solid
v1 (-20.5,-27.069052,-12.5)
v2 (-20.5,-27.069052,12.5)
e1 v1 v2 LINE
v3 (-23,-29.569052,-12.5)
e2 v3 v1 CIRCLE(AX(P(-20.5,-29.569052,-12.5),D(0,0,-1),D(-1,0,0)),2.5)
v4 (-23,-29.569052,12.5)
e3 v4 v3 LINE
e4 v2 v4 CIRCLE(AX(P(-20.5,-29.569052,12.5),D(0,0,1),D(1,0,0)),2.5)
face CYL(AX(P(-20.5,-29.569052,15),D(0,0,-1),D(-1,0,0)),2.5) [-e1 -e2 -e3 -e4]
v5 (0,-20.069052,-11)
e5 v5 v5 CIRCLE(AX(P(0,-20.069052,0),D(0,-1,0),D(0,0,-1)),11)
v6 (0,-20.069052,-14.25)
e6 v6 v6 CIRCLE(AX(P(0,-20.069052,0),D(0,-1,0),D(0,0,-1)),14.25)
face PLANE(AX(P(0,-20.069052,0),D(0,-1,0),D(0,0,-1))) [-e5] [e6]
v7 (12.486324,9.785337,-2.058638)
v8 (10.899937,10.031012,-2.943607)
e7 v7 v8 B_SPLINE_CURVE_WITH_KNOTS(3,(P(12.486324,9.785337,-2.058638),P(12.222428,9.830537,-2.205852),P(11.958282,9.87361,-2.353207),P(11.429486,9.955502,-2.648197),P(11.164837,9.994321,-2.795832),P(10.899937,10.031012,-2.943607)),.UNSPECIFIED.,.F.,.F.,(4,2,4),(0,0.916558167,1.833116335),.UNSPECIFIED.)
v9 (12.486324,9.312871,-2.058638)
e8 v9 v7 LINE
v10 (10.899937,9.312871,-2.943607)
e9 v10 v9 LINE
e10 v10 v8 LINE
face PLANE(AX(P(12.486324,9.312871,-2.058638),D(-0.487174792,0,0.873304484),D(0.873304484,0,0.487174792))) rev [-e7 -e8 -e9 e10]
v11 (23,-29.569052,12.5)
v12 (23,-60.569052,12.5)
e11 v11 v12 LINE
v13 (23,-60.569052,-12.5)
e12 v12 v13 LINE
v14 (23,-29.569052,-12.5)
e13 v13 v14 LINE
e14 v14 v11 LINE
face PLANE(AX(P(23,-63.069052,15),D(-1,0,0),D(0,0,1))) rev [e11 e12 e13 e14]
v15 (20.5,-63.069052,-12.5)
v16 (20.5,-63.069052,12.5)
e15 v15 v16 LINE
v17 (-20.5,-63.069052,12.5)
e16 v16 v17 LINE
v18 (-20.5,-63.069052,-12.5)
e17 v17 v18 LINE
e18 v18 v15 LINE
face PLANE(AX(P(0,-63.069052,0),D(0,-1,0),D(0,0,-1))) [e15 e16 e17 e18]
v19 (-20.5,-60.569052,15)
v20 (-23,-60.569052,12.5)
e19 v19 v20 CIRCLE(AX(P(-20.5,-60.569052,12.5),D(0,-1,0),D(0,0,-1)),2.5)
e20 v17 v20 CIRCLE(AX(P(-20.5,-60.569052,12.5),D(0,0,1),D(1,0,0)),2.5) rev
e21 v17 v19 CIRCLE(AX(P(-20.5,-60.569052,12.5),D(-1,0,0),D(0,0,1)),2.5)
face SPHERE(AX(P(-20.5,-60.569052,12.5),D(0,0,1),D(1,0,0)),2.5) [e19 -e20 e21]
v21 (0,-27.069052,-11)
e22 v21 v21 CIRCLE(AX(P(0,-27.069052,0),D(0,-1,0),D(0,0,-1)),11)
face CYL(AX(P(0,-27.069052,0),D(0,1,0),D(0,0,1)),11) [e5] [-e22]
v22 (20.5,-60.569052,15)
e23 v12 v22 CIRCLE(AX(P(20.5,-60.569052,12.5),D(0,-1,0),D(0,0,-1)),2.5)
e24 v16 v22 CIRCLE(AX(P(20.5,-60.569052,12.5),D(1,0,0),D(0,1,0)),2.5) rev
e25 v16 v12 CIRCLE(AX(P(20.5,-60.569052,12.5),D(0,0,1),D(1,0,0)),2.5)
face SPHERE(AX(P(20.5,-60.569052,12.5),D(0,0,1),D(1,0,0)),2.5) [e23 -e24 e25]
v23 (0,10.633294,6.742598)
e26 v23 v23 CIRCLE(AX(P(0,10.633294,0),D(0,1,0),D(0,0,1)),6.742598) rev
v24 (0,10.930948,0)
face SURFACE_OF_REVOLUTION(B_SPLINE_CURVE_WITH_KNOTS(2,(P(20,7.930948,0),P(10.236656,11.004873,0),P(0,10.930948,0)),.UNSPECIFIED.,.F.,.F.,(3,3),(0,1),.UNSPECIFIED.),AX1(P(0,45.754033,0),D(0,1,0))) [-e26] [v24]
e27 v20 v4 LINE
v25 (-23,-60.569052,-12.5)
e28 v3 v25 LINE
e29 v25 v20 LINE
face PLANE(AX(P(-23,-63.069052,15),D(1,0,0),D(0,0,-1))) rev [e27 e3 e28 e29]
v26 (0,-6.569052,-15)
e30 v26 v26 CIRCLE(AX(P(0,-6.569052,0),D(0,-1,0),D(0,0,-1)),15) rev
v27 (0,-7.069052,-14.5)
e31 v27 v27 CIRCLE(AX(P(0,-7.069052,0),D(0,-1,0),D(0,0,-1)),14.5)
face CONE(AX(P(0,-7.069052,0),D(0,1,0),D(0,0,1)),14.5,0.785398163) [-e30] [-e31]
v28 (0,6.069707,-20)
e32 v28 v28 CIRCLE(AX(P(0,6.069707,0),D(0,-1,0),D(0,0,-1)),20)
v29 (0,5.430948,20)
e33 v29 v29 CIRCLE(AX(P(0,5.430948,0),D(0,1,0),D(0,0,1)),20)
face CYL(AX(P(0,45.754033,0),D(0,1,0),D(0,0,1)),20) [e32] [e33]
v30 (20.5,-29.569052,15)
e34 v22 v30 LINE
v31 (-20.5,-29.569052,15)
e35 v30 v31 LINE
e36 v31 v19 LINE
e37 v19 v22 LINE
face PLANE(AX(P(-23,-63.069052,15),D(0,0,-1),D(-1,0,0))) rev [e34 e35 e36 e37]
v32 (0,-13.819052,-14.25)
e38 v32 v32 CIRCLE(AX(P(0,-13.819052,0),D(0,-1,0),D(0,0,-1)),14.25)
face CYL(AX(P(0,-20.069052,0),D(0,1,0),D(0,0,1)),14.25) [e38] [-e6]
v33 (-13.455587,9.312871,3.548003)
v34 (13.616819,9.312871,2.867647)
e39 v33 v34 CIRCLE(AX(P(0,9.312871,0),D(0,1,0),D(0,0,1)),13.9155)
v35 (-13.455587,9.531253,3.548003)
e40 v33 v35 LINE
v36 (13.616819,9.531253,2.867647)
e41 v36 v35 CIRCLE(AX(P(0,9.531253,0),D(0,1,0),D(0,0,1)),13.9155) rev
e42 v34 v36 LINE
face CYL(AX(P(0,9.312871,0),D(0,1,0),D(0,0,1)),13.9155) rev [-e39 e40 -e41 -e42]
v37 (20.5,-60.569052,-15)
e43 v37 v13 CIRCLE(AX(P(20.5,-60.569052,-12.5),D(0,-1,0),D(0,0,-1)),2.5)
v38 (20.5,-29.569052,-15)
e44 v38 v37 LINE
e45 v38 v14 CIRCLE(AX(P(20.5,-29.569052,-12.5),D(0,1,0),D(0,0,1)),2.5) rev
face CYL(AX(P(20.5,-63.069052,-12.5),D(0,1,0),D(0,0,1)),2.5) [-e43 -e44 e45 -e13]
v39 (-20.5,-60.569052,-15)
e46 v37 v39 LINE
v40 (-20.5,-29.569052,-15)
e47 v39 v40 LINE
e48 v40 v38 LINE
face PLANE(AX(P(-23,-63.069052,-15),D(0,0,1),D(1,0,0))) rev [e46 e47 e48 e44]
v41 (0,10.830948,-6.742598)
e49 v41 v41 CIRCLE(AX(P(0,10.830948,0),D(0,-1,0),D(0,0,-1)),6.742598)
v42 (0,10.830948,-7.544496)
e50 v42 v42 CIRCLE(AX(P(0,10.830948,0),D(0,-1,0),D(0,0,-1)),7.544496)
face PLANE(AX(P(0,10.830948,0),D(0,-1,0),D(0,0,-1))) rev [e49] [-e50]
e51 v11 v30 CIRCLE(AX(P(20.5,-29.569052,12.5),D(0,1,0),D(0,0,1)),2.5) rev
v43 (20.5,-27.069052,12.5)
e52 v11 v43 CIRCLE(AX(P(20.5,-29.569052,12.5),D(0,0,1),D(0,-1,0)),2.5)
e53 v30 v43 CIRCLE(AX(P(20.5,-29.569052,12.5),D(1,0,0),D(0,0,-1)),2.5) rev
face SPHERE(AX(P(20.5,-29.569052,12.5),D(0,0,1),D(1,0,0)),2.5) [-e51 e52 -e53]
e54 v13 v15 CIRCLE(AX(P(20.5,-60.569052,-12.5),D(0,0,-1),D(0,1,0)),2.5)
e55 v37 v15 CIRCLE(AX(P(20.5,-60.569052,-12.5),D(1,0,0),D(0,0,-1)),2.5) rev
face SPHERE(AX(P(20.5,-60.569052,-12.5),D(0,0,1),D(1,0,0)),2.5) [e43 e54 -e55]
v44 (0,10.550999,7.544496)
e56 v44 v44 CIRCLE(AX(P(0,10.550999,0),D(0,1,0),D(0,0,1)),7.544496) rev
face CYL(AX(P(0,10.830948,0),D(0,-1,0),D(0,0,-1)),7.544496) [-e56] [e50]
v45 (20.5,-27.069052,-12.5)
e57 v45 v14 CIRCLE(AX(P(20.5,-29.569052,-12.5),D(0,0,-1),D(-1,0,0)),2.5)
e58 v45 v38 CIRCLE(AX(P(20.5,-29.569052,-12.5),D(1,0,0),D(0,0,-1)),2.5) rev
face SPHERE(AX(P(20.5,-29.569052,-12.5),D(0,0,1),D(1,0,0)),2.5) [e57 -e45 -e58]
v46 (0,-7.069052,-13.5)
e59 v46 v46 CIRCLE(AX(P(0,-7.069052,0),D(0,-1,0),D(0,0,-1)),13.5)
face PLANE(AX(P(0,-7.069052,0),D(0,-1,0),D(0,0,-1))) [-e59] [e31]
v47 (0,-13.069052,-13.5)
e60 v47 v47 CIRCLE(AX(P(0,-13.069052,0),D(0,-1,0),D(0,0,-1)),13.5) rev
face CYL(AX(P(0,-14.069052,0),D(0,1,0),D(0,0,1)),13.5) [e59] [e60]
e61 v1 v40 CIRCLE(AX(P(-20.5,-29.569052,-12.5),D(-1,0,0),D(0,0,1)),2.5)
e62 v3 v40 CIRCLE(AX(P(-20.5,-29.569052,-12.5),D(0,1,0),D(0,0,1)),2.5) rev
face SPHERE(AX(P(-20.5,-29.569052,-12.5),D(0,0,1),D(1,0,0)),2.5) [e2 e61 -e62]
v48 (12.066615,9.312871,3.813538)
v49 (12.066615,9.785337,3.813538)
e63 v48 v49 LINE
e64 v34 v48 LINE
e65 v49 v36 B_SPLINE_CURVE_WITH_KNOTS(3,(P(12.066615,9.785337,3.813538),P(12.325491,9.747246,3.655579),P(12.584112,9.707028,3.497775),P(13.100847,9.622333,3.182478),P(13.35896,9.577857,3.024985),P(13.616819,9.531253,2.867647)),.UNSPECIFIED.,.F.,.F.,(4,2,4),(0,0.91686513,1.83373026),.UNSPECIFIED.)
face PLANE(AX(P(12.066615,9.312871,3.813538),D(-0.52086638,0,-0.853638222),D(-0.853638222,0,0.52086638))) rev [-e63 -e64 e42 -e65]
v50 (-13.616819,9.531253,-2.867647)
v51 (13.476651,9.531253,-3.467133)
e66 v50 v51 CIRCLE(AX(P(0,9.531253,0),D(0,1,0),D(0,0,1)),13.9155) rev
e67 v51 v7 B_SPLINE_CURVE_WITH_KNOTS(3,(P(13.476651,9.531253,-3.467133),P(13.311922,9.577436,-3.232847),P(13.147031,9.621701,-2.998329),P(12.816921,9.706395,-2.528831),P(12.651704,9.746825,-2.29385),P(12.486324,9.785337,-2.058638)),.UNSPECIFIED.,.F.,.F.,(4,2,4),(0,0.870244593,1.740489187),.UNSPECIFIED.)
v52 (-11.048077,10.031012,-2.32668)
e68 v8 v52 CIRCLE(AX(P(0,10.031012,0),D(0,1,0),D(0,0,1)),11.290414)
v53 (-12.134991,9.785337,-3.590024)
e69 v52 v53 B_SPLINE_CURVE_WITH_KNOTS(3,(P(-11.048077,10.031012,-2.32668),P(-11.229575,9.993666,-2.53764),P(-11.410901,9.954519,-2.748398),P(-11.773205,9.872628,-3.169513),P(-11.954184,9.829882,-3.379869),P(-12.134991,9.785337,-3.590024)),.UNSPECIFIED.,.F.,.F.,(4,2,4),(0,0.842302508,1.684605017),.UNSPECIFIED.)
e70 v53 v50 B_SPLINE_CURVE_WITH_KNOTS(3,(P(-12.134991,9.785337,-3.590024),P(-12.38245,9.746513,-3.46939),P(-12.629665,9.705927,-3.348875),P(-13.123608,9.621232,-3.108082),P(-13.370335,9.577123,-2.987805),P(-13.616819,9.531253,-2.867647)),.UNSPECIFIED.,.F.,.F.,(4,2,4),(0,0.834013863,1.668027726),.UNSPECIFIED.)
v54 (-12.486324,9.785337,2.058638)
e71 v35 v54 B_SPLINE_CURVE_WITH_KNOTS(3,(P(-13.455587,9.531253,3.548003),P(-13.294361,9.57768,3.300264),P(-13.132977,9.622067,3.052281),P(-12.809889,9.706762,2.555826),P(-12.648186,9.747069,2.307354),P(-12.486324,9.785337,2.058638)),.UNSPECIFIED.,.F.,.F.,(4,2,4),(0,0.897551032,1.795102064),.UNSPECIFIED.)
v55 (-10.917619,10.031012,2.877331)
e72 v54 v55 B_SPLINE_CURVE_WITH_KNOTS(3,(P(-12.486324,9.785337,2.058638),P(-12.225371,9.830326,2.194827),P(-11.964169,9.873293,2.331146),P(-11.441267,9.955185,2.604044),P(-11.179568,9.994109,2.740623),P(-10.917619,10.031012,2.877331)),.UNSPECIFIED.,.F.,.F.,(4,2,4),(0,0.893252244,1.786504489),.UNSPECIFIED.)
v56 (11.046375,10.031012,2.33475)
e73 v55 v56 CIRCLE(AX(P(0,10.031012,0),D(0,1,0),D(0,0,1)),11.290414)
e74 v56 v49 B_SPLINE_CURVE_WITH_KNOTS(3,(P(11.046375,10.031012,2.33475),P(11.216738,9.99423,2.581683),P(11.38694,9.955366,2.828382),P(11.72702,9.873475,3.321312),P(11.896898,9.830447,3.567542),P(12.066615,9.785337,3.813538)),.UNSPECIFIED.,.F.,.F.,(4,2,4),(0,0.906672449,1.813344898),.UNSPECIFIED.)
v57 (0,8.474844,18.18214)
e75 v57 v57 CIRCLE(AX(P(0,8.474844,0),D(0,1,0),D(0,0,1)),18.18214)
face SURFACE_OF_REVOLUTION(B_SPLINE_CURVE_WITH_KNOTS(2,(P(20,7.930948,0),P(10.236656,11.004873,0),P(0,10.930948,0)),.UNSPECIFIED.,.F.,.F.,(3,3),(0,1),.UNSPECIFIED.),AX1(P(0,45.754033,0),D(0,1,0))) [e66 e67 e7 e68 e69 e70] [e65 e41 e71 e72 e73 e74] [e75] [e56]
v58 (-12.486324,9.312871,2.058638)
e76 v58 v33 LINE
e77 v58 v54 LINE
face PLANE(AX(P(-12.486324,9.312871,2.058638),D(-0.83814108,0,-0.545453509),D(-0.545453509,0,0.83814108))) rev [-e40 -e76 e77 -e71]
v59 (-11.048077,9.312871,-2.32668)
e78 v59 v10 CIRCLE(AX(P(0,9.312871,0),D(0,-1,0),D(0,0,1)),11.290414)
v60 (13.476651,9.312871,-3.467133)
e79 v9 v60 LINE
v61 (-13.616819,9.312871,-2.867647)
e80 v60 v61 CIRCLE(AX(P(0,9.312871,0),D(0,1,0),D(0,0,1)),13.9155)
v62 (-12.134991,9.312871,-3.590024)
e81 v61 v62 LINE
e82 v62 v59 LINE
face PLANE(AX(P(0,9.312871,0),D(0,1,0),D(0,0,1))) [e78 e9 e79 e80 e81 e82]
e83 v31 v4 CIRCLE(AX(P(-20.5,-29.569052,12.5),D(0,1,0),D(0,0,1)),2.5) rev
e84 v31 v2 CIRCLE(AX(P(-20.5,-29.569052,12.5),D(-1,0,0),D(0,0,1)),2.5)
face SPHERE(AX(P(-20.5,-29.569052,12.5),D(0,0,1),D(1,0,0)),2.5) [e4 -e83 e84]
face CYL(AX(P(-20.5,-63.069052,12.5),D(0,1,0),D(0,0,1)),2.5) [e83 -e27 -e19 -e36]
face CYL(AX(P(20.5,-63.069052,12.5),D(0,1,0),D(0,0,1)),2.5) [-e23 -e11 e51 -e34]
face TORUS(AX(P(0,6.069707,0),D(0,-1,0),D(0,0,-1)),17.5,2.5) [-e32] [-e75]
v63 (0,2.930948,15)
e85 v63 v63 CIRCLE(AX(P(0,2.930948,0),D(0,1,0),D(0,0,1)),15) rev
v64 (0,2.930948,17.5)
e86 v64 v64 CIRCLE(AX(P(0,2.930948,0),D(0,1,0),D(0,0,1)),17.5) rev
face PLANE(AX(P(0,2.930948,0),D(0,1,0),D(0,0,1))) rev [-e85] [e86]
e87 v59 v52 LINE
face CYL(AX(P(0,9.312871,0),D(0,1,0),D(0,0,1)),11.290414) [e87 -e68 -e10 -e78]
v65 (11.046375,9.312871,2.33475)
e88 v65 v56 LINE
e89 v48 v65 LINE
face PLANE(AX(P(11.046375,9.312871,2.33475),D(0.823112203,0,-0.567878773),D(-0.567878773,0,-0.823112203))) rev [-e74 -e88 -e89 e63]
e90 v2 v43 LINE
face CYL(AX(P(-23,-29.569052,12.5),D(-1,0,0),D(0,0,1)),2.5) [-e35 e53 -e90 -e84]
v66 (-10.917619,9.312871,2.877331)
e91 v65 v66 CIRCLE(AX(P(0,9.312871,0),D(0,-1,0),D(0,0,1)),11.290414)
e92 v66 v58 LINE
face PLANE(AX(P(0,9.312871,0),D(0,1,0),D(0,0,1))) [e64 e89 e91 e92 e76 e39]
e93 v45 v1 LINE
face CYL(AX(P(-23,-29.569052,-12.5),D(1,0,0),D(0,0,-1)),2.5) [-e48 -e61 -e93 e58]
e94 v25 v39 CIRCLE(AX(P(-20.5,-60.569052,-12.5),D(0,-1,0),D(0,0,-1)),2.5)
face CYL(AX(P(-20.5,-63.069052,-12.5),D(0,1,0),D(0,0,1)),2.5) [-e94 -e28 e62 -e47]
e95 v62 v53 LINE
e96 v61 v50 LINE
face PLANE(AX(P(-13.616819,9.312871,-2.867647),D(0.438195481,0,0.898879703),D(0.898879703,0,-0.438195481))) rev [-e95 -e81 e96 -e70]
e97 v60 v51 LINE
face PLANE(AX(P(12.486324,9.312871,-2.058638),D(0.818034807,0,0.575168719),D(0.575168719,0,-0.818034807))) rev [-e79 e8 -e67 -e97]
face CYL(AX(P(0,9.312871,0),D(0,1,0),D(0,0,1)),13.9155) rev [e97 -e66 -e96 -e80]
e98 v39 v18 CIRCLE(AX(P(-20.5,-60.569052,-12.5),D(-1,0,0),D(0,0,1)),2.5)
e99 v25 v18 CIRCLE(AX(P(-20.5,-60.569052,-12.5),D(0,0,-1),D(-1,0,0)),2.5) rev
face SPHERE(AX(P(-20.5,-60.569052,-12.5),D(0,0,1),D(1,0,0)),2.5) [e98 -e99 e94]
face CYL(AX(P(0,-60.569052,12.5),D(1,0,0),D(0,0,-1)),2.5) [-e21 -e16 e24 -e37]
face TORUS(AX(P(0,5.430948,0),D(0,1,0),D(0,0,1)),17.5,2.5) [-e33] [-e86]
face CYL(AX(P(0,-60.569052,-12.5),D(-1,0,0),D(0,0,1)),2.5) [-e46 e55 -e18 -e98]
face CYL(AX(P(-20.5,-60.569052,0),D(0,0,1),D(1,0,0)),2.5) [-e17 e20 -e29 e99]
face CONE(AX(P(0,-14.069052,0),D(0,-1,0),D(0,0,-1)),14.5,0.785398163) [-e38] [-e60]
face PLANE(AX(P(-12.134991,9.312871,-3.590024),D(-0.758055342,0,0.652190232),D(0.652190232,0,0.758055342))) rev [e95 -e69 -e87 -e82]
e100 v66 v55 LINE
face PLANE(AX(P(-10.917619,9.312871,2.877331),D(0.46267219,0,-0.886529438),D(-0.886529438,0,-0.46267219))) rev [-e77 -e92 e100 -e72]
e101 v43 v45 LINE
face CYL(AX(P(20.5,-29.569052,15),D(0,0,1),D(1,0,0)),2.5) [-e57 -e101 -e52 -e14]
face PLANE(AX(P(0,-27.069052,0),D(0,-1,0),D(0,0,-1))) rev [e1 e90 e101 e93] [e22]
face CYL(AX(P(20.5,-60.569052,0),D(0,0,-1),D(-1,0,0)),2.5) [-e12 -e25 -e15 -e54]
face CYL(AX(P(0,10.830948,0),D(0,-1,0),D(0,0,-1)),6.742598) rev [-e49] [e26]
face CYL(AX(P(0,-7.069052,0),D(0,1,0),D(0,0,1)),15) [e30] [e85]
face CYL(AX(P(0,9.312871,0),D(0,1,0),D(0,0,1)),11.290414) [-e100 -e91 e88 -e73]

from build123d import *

# Parameters (mm, degrees)
FILLET_2_R          = 2.5
CUT_EXTRUDE_2_DEPTH = 4.5
SKETCH_6_R          = 7.544495516
SKETCH_6_R_2        = 6.742597779
EXTRUDE_2_DEPTH     = 7.9
SKETCH_7_R          = 15
EXTRUDE_3_DEPTH     = 10
CHAMFER_1_SIZE      = 0.5
SKETCH_8_R          = 13.5
EXTRUDE_4_DEPTH     = 7
SKETCH_9_R          = 14.25
EXTRUDE_5_DEPTH     = 6
CHAMFER_2_SIZE      = 1
SKETCH_10_R         = 11
EXTRUDE_6_DEPTH     = 7
SKETCH_11_W         = 46
SKETCH_11_H         = 30
EXTRUDE_7_DEPTH     = 36
FILLET_3_R          = 2.5


with BuildPart() as part:
    # Эскиз2 → Повернуть1 (revolve)
    with BuildSketch(Plane.XY, mode=Mode.PRIVATE) as revolve_1_sk:
        with BuildLine():
            Line((0, 2.930948498), (20, 2.930948498))
            Line((20, 2.930948498), (20, 7.930948498))
            add(Edge.make_bspline(
                [(20, 7.930948498), (10.236656465, 11.004873072), (0, 10.930948498)],
                knots=[0, 0, 0, 1, 1, 1], degree=2))
            Line((0, 10.930948498), (0, 2.930948498))
        make_face()
    revolve(revolve_1_sk.sketch.rotate(Axis((0, 45.754032666, 0), (0, -1, 0)), 90), axis=Axis((0, 45.754032666, 0), (0, -1, 0)))

    # Скругление2
    fillet_2_edges = [part.edges().sort_by_distance(p)[0] for p in [
        (0, 2.930948498, -20),
        (0, 7.930948498, -20),
    ]]
    fillet(fillet_2_edges, radius=FILLET_2_R)

    # Эскиз5 → Вырез-Вытянуть2 (cut)
    with BuildSketch(Plane(origin=(0, 13.812870775, 0), x_dir=(1, 0, 0), z_dir=(0, 1, 0))):
        with BuildLine():
            Line((-13.616818713, 2.867646528), (-12.134990634, 3.590023912))
            Line((-12.134990634, 3.590023912), (-11.048077198, 2.326680033))
            ThreePointArc((-11.048077198, 2.326680033), (-0.317231994, 11.285956477), (10.899937011, 2.943607126))
            Line((10.899937011, 2.943607126), (12.486323695, 2.058637888))
            Line((12.486323695, 2.058637888), (13.476651449, 3.467133424))
            ThreePointArc((13.476651449, 3.467133424), (-0.307827631, 13.91209512), (-13.616818713, 2.867646528))
        make_face()
        with BuildLine():
            Line((11.046374652, -2.334749837), (12.066615041, -3.813537836))
            Line((12.066615041, -3.813537836), (13.616818713, -2.867646528))
            ThreePointArc((13.616818713, -2.867646528), (0.349599989, -13.911108091), (-13.455587055, -3.548003025))
            Line((-13.455587055, -3.548003025), (-12.486323695, -2.058637888))
            Line((-12.486323695, -2.058637888), (-10.917619437, -2.877331328))
            ThreePointArc((-10.917619437, -2.877331328), (0.278824577, -11.286970657), (11.046374652, -2.334749837))
        make_face()
    extrude(amount=-CUT_EXTRUDE_2_DEPTH, mode=Mode.SUBTRACT)

    # Эскиз6 → Бобышка-Вытянуть2 (add)
    with BuildSketch(Plane.XZ.offset(-2.930948498)):
        with Locations(Location((0, 0, 0), (0, 0, 270))):
            Circle(SKETCH_6_R)
        with Locations(Location((0, 0, 0), (0, 0, 270))):
            Circle(SKETCH_6_R_2, mode=Mode.SUBTRACT)
    extrude(amount=-EXTRUDE_2_DEPTH)

    # Эскиз7 → Бобышка-Вытянуть3 (add)
    with BuildSketch(Plane.XZ.offset(-2.930948498)):
        with Locations(Location((0, 0, 0), (0, 0, 90))):
            Circle(SKETCH_7_R)
    extrude(amount=EXTRUDE_3_DEPTH)

    # Фаска1
    chamfer_1_edges = [part.edges().sort_by_distance(p)[0] for p in [
        (0, -7.069051502, -15),
    ]]
    chamfer(chamfer_1_edges, length=CHAMFER_1_SIZE)

    # Эскиз8 → Бобышка-Вытянуть4 (add)
    with BuildSketch(Plane.XZ.offset(7.069051502)):
        with Locations(Location((0, 0, 0), (0, 0, 270))):
            Circle(SKETCH_8_R)
    extrude(amount=EXTRUDE_4_DEPTH)

    # Эскиз9 → Бобышка-Вытянуть5 (add)
    with BuildSketch(Plane.XZ.offset(14.069051502)):
        with Locations(Location((0, 0, 0), (0, 0, 270))):
            Circle(SKETCH_9_R)
    extrude(amount=EXTRUDE_5_DEPTH)

    # Фаска2
    # the kernel refuses this chamfer: 1 mm, written as the material it adds along each edge
    with BuildSketch(Plane(origin=(0, -14.069051502, 0), x_dir=(0, 0, -1), z_dir=(-1, 0, 0))) as chamfer_2_piece_1_section:
        Polygon((13.5 + CHAMFER_2_SIZE, 0), (13.5, -CHAMFER_2_SIZE), (13.5, 0), align=None)
    chamfer_2_piece_1 = revolve(axis=Axis((0, -14.069051502, 0), (0, -1, 0)), mode=Mode.PRIVATE)
    chamfer_2_piece_1 = chamfer_2_piece_1 & Plane(origin=(0, -13.454886429, 0), x_dir=(0, 0, -1), z_dir=(0, 1, 0)) * Cylinder(14.25, 58, mode=Mode.PRIVATE)
    add(chamfer_2_piece_1)

    # Эскиз10 → Бобышка-Вытянуть6 (add)
    with BuildSketch(Plane.XZ.offset(20.069051502)):
        with Locations(Location((0, 0, 0), (0, 0, 270))):
            Circle(SKETCH_10_R)
    extrude(amount=EXTRUDE_6_DEPTH)

    # Эскиз11 → Бобышка-Вытянуть7 (add)
    with BuildSketch(Plane.XZ.offset(27.069051502)):
        Rectangle(SKETCH_11_W, SKETCH_11_H)
    extrude(amount=EXTRUDE_7_DEPTH)

    # Скругление3
    fillet_3_edges = [part.edges().sort_by_distance(p)[0] for p in [
        (-23, -27.069051502, 0),
        (-23, -45.069051502, 15),
        (0, -27.069051502, -15),
        (-23, -45.069051502, -15),
        (23, -27.069051502, 0),
        (23, -45.069051502, -15),
        (0, -27.069051502, 15),
        (23, -45.069051502, 15),
        (-23, -63.069051502, 0),
        (0, -63.069051502, -15),
        (23, -63.069051502, 0),
        (0, -63.069051502, 15),
    ]]
    fillet(fillet_3_edges, radius=FILLET_3_R)


solid = part.part
